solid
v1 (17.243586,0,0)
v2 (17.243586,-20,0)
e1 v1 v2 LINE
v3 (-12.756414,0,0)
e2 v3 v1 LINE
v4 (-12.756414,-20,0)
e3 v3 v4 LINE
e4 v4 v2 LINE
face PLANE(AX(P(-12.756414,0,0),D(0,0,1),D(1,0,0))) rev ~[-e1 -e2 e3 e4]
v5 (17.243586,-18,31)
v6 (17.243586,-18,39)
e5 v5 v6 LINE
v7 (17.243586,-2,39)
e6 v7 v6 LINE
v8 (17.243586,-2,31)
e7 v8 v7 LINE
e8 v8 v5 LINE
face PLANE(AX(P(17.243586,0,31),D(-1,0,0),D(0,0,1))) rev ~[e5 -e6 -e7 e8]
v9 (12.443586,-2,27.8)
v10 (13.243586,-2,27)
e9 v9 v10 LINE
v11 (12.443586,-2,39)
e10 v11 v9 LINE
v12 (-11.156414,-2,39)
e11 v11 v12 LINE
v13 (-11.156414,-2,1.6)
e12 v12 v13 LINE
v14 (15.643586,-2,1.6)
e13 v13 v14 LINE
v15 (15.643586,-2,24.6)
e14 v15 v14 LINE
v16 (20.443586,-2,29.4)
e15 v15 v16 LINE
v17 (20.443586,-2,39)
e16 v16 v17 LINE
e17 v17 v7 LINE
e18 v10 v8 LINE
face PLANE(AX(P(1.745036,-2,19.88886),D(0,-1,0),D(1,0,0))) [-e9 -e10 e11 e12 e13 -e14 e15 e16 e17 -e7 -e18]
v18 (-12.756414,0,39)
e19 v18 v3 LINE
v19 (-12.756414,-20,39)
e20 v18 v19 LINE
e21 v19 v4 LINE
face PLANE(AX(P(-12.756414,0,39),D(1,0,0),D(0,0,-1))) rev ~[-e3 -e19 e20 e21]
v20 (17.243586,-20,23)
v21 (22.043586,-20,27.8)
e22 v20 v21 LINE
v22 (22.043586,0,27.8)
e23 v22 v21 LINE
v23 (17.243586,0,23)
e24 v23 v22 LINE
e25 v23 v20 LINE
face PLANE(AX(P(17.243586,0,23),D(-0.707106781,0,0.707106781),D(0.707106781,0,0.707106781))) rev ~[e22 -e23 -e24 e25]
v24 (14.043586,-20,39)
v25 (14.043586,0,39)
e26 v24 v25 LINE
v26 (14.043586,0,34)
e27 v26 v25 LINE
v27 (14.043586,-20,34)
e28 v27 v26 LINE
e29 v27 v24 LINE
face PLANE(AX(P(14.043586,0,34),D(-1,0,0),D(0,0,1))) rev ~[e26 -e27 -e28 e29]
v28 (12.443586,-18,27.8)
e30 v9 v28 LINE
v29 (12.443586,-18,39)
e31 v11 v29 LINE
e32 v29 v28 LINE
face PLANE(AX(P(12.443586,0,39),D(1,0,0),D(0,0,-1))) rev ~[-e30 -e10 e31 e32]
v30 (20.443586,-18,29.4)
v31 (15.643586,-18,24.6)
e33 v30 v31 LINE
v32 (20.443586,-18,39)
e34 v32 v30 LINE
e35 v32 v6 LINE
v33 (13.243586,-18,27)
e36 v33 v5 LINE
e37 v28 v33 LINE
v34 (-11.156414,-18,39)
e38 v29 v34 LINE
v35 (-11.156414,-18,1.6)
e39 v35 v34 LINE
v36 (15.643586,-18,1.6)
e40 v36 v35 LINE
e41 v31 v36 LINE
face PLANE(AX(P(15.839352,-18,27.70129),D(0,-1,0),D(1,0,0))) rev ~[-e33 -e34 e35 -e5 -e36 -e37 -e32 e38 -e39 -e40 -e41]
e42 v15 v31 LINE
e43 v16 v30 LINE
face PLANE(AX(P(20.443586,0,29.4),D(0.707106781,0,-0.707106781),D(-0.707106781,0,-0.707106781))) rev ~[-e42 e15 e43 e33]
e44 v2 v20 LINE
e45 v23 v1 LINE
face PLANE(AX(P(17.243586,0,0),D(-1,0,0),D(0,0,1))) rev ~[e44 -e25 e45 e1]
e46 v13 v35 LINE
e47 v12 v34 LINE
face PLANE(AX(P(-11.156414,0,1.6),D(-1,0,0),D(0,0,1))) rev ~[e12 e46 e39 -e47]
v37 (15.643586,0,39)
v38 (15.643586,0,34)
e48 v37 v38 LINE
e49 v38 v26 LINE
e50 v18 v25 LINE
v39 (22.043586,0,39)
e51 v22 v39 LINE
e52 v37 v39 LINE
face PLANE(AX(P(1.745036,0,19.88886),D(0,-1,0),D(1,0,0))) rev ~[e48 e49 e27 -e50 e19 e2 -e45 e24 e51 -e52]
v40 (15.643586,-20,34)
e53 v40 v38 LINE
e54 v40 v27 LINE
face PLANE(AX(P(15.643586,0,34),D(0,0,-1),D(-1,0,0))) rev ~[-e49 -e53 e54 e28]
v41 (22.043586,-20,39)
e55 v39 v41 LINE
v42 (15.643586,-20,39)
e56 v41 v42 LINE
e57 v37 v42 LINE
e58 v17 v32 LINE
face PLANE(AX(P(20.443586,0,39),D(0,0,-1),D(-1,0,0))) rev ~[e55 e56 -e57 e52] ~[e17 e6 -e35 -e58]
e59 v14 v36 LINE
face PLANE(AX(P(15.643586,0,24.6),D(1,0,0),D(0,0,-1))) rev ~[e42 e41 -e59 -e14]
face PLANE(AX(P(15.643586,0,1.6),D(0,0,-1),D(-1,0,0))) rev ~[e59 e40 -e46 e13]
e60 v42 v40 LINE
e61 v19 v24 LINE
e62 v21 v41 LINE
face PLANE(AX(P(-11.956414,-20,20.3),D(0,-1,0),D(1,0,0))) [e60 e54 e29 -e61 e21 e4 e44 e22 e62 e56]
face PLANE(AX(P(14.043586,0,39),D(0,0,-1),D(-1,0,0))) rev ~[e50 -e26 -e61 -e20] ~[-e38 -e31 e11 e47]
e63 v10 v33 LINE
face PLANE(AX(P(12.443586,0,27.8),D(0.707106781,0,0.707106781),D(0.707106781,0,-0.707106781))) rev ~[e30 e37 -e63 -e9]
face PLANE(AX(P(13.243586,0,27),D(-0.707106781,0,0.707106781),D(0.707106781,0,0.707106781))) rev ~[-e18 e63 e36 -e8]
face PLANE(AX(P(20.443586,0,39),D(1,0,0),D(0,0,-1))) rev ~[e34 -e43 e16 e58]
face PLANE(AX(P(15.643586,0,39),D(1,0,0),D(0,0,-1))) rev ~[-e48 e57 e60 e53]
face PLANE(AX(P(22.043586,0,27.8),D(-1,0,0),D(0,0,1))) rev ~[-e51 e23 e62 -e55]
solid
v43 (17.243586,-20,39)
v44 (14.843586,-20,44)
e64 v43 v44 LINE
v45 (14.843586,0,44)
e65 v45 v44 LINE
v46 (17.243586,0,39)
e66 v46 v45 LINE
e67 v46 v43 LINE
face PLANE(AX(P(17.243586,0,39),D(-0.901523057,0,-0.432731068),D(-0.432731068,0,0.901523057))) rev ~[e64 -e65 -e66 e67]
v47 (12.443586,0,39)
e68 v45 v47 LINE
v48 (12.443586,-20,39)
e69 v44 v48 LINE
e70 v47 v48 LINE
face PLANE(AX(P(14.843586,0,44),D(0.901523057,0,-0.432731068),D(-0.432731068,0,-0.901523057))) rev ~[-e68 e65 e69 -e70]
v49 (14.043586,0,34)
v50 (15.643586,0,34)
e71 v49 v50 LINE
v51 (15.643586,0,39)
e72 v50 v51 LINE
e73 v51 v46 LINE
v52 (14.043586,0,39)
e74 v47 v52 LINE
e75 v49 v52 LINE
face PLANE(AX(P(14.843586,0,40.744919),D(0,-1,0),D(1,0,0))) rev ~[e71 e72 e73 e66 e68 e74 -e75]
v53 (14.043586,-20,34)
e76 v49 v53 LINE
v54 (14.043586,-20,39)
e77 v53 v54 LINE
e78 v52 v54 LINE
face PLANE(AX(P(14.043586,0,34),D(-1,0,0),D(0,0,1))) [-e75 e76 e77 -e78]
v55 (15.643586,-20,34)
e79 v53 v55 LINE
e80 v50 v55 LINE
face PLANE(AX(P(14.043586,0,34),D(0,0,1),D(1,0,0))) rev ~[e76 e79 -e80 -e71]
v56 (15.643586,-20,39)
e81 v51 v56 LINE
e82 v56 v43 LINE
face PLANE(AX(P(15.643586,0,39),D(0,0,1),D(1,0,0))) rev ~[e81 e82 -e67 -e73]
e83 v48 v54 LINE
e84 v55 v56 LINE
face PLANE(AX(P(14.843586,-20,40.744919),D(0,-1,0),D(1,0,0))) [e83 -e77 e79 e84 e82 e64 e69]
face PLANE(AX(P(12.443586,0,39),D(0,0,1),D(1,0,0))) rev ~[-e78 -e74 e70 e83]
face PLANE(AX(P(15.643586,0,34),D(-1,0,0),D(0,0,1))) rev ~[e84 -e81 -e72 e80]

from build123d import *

# Parameters (mm, degrees)
F0_W     = 1.6
F0_H     = 37.4
F1_DEPTH = 20
F2_DEPTH = 2
F3_START = 18
F3_DEPTH = 2
F0_H_2   = 5
F4_DEPTH = 20


with BuildPart() as f1:
    # F0 (on Front) → F1 (new body)
    with BuildSketch(Plane.XZ):
        with Locations((-11.9564137042, 20.3)):
            Rectangle(F0_W, F0_H)
        Polygon((-11.1564137042, 1.6), (-12.7564137042, 1.6), (-12.7564137042, 0), (17.2435862958, 0), (17.2435862958, 1.6), (15.6435862958, 1.6), (14.0435862958, 1.6), align=None)
        Polygon((15.6435862958, 24.6), (15.6435862958, 1.6), (17.2435862958, 1.6), (17.2435862958, 23), align=None)
        Polygon((17.2435862958, 26.2), (15.6435862958, 24.6), (17.2435862958, 23), align=None)
        Polygon((17.2435862958, 26.2), (17.2435862958, 23), (22.0435862958, 27.8), (22.0435862958, 39), (20.4435862958, 39), (20.4435862958, 29.4), align=None)
    extrude(amount=F1_DEPTH)



with BuildPart() as f1b:
    # F0 (on Front) → F1, piece 2 (new body)
    with BuildSketch(Plane.XZ):
        Polygon((14.0435862958, 39), (12.4435862958, 39), (12.4435862958, 27.8), (13.2435862958, 27), (17.2435862958, 31), (17.2435862958, 39), (15.6435862958, 39), (15.6435862958, 34), (14.0435862958, 34), align=None)
    extrude(amount=F1_DEPTH)


with BuildPart() as f1_1:
    add(f1.part)

    add(f1b.part)  # F2 merges F1b
    # F0 (on Front) → F2 (join)
    with BuildSketch(Plane.XZ):
        Polygon((-11.1564137042, 39), (-11.1564137042, 1.6), (14.0435862958, 1.6), (15.6435862958, 1.6), (15.6435862958, 24.6), (13.2435862958, 27), (12.4435862958, 27.8), (12.4435862958, 39), align=None)
        Polygon((15.6435862958, 24.6), (15.6435862958, 1.6), (17.2435862958, 1.6), (17.2435862958, 23), align=None)
        Polygon((14.0435862958, 39), (12.4435862958, 39), (12.4435862958, 27.8), (13.2435862958, 27), (17.2435862958, 31), (17.2435862958, 39), (15.6435862958, 39), (15.6435862958, 34), (14.0435862958, 34), align=None)
        Polygon((13.2435862958, 27), (15.6435862958, 24.6), (17.2435862958, 26.2), (17.2435862958, 31), align=None)
        Polygon((17.2435862958, 31), (17.2435862958, 26.2), (20.4435862958, 29.4), (20.4435862958, 39), (17.2435862958, 39), align=None)
    extrude(amount=F2_DEPTH)

    # F0 (on Front) → F3 (join)
    with BuildSketch(Plane.XZ.offset(F3_START)):
        Polygon((13.2435862958, 27), (15.6435862958, 24.6), (17.2435862958, 26.2), (17.2435862958, 31), align=None)
        Polygon((17.2435862958, 26.2), (17.2435862958, 23), (22.0435862958, 27.8), (22.0435862958, 39), (20.4435862958, 39), (20.4435862958, 29.4), align=None)
        Polygon((17.2435862958, 31), (17.2435862958, 26.2), (20.4435862958, 29.4), (20.4435862958, 39), (17.2435862958, 39), align=None)
        Polygon((17.2435862958, 26.2), (15.6435862958, 24.6), (17.2435862958, 23), align=None)
        Polygon((15.6435862958, 24.6), (15.6435862958, 1.6), (17.2435862958, 1.6), (17.2435862958, 23), align=None)
        Polygon((-11.1564137042, 39), (-11.1564137042, 1.6), (14.0435862958, 1.6), (15.6435862958, 1.6), (15.6435862958, 24.6), (13.2435862958, 27), (12.4435862958, 27.8), (12.4435862958, 39), align=None)
        Polygon((-11.1564137042, 1.6), (-12.7564137042, 1.6), (-12.7564137042, 0), (17.2435862958, 0), (17.2435862958, 1.6), (15.6435862958, 1.6), (14.0435862958, 1.6), align=None)
        with Locations((-11.9564137042, 20.3)):
            Rectangle(F0_W, F0_H)
        Polygon((14.0435862958, 39), (12.4435862958, 39), (12.4435862958, 27.8), (13.2435862958, 27), (17.2435862958, 31), (17.2435862958, 39), (15.6435862958, 39), (15.6435862958, 34), (14.0435862958, 34), align=None)
    extrude(amount=F3_DEPTH)


with BuildPart() as f4:
    # F0 (on Front) → F4 (new body)
    with BuildSketch(Plane.XZ):
        Polygon((14.8435862958, 44), (12.4435862958, 39), (14.0435862958, 39), (15.6435862958, 39), (17.2435862958, 39), align=None)
        with Locations((14.8435862958, 36.5)):
            Rectangle(F0_W, F0_H_2)
    extrude(amount=F4_DEPTH)


solid = Compound([f1_1.part, f4.part])
